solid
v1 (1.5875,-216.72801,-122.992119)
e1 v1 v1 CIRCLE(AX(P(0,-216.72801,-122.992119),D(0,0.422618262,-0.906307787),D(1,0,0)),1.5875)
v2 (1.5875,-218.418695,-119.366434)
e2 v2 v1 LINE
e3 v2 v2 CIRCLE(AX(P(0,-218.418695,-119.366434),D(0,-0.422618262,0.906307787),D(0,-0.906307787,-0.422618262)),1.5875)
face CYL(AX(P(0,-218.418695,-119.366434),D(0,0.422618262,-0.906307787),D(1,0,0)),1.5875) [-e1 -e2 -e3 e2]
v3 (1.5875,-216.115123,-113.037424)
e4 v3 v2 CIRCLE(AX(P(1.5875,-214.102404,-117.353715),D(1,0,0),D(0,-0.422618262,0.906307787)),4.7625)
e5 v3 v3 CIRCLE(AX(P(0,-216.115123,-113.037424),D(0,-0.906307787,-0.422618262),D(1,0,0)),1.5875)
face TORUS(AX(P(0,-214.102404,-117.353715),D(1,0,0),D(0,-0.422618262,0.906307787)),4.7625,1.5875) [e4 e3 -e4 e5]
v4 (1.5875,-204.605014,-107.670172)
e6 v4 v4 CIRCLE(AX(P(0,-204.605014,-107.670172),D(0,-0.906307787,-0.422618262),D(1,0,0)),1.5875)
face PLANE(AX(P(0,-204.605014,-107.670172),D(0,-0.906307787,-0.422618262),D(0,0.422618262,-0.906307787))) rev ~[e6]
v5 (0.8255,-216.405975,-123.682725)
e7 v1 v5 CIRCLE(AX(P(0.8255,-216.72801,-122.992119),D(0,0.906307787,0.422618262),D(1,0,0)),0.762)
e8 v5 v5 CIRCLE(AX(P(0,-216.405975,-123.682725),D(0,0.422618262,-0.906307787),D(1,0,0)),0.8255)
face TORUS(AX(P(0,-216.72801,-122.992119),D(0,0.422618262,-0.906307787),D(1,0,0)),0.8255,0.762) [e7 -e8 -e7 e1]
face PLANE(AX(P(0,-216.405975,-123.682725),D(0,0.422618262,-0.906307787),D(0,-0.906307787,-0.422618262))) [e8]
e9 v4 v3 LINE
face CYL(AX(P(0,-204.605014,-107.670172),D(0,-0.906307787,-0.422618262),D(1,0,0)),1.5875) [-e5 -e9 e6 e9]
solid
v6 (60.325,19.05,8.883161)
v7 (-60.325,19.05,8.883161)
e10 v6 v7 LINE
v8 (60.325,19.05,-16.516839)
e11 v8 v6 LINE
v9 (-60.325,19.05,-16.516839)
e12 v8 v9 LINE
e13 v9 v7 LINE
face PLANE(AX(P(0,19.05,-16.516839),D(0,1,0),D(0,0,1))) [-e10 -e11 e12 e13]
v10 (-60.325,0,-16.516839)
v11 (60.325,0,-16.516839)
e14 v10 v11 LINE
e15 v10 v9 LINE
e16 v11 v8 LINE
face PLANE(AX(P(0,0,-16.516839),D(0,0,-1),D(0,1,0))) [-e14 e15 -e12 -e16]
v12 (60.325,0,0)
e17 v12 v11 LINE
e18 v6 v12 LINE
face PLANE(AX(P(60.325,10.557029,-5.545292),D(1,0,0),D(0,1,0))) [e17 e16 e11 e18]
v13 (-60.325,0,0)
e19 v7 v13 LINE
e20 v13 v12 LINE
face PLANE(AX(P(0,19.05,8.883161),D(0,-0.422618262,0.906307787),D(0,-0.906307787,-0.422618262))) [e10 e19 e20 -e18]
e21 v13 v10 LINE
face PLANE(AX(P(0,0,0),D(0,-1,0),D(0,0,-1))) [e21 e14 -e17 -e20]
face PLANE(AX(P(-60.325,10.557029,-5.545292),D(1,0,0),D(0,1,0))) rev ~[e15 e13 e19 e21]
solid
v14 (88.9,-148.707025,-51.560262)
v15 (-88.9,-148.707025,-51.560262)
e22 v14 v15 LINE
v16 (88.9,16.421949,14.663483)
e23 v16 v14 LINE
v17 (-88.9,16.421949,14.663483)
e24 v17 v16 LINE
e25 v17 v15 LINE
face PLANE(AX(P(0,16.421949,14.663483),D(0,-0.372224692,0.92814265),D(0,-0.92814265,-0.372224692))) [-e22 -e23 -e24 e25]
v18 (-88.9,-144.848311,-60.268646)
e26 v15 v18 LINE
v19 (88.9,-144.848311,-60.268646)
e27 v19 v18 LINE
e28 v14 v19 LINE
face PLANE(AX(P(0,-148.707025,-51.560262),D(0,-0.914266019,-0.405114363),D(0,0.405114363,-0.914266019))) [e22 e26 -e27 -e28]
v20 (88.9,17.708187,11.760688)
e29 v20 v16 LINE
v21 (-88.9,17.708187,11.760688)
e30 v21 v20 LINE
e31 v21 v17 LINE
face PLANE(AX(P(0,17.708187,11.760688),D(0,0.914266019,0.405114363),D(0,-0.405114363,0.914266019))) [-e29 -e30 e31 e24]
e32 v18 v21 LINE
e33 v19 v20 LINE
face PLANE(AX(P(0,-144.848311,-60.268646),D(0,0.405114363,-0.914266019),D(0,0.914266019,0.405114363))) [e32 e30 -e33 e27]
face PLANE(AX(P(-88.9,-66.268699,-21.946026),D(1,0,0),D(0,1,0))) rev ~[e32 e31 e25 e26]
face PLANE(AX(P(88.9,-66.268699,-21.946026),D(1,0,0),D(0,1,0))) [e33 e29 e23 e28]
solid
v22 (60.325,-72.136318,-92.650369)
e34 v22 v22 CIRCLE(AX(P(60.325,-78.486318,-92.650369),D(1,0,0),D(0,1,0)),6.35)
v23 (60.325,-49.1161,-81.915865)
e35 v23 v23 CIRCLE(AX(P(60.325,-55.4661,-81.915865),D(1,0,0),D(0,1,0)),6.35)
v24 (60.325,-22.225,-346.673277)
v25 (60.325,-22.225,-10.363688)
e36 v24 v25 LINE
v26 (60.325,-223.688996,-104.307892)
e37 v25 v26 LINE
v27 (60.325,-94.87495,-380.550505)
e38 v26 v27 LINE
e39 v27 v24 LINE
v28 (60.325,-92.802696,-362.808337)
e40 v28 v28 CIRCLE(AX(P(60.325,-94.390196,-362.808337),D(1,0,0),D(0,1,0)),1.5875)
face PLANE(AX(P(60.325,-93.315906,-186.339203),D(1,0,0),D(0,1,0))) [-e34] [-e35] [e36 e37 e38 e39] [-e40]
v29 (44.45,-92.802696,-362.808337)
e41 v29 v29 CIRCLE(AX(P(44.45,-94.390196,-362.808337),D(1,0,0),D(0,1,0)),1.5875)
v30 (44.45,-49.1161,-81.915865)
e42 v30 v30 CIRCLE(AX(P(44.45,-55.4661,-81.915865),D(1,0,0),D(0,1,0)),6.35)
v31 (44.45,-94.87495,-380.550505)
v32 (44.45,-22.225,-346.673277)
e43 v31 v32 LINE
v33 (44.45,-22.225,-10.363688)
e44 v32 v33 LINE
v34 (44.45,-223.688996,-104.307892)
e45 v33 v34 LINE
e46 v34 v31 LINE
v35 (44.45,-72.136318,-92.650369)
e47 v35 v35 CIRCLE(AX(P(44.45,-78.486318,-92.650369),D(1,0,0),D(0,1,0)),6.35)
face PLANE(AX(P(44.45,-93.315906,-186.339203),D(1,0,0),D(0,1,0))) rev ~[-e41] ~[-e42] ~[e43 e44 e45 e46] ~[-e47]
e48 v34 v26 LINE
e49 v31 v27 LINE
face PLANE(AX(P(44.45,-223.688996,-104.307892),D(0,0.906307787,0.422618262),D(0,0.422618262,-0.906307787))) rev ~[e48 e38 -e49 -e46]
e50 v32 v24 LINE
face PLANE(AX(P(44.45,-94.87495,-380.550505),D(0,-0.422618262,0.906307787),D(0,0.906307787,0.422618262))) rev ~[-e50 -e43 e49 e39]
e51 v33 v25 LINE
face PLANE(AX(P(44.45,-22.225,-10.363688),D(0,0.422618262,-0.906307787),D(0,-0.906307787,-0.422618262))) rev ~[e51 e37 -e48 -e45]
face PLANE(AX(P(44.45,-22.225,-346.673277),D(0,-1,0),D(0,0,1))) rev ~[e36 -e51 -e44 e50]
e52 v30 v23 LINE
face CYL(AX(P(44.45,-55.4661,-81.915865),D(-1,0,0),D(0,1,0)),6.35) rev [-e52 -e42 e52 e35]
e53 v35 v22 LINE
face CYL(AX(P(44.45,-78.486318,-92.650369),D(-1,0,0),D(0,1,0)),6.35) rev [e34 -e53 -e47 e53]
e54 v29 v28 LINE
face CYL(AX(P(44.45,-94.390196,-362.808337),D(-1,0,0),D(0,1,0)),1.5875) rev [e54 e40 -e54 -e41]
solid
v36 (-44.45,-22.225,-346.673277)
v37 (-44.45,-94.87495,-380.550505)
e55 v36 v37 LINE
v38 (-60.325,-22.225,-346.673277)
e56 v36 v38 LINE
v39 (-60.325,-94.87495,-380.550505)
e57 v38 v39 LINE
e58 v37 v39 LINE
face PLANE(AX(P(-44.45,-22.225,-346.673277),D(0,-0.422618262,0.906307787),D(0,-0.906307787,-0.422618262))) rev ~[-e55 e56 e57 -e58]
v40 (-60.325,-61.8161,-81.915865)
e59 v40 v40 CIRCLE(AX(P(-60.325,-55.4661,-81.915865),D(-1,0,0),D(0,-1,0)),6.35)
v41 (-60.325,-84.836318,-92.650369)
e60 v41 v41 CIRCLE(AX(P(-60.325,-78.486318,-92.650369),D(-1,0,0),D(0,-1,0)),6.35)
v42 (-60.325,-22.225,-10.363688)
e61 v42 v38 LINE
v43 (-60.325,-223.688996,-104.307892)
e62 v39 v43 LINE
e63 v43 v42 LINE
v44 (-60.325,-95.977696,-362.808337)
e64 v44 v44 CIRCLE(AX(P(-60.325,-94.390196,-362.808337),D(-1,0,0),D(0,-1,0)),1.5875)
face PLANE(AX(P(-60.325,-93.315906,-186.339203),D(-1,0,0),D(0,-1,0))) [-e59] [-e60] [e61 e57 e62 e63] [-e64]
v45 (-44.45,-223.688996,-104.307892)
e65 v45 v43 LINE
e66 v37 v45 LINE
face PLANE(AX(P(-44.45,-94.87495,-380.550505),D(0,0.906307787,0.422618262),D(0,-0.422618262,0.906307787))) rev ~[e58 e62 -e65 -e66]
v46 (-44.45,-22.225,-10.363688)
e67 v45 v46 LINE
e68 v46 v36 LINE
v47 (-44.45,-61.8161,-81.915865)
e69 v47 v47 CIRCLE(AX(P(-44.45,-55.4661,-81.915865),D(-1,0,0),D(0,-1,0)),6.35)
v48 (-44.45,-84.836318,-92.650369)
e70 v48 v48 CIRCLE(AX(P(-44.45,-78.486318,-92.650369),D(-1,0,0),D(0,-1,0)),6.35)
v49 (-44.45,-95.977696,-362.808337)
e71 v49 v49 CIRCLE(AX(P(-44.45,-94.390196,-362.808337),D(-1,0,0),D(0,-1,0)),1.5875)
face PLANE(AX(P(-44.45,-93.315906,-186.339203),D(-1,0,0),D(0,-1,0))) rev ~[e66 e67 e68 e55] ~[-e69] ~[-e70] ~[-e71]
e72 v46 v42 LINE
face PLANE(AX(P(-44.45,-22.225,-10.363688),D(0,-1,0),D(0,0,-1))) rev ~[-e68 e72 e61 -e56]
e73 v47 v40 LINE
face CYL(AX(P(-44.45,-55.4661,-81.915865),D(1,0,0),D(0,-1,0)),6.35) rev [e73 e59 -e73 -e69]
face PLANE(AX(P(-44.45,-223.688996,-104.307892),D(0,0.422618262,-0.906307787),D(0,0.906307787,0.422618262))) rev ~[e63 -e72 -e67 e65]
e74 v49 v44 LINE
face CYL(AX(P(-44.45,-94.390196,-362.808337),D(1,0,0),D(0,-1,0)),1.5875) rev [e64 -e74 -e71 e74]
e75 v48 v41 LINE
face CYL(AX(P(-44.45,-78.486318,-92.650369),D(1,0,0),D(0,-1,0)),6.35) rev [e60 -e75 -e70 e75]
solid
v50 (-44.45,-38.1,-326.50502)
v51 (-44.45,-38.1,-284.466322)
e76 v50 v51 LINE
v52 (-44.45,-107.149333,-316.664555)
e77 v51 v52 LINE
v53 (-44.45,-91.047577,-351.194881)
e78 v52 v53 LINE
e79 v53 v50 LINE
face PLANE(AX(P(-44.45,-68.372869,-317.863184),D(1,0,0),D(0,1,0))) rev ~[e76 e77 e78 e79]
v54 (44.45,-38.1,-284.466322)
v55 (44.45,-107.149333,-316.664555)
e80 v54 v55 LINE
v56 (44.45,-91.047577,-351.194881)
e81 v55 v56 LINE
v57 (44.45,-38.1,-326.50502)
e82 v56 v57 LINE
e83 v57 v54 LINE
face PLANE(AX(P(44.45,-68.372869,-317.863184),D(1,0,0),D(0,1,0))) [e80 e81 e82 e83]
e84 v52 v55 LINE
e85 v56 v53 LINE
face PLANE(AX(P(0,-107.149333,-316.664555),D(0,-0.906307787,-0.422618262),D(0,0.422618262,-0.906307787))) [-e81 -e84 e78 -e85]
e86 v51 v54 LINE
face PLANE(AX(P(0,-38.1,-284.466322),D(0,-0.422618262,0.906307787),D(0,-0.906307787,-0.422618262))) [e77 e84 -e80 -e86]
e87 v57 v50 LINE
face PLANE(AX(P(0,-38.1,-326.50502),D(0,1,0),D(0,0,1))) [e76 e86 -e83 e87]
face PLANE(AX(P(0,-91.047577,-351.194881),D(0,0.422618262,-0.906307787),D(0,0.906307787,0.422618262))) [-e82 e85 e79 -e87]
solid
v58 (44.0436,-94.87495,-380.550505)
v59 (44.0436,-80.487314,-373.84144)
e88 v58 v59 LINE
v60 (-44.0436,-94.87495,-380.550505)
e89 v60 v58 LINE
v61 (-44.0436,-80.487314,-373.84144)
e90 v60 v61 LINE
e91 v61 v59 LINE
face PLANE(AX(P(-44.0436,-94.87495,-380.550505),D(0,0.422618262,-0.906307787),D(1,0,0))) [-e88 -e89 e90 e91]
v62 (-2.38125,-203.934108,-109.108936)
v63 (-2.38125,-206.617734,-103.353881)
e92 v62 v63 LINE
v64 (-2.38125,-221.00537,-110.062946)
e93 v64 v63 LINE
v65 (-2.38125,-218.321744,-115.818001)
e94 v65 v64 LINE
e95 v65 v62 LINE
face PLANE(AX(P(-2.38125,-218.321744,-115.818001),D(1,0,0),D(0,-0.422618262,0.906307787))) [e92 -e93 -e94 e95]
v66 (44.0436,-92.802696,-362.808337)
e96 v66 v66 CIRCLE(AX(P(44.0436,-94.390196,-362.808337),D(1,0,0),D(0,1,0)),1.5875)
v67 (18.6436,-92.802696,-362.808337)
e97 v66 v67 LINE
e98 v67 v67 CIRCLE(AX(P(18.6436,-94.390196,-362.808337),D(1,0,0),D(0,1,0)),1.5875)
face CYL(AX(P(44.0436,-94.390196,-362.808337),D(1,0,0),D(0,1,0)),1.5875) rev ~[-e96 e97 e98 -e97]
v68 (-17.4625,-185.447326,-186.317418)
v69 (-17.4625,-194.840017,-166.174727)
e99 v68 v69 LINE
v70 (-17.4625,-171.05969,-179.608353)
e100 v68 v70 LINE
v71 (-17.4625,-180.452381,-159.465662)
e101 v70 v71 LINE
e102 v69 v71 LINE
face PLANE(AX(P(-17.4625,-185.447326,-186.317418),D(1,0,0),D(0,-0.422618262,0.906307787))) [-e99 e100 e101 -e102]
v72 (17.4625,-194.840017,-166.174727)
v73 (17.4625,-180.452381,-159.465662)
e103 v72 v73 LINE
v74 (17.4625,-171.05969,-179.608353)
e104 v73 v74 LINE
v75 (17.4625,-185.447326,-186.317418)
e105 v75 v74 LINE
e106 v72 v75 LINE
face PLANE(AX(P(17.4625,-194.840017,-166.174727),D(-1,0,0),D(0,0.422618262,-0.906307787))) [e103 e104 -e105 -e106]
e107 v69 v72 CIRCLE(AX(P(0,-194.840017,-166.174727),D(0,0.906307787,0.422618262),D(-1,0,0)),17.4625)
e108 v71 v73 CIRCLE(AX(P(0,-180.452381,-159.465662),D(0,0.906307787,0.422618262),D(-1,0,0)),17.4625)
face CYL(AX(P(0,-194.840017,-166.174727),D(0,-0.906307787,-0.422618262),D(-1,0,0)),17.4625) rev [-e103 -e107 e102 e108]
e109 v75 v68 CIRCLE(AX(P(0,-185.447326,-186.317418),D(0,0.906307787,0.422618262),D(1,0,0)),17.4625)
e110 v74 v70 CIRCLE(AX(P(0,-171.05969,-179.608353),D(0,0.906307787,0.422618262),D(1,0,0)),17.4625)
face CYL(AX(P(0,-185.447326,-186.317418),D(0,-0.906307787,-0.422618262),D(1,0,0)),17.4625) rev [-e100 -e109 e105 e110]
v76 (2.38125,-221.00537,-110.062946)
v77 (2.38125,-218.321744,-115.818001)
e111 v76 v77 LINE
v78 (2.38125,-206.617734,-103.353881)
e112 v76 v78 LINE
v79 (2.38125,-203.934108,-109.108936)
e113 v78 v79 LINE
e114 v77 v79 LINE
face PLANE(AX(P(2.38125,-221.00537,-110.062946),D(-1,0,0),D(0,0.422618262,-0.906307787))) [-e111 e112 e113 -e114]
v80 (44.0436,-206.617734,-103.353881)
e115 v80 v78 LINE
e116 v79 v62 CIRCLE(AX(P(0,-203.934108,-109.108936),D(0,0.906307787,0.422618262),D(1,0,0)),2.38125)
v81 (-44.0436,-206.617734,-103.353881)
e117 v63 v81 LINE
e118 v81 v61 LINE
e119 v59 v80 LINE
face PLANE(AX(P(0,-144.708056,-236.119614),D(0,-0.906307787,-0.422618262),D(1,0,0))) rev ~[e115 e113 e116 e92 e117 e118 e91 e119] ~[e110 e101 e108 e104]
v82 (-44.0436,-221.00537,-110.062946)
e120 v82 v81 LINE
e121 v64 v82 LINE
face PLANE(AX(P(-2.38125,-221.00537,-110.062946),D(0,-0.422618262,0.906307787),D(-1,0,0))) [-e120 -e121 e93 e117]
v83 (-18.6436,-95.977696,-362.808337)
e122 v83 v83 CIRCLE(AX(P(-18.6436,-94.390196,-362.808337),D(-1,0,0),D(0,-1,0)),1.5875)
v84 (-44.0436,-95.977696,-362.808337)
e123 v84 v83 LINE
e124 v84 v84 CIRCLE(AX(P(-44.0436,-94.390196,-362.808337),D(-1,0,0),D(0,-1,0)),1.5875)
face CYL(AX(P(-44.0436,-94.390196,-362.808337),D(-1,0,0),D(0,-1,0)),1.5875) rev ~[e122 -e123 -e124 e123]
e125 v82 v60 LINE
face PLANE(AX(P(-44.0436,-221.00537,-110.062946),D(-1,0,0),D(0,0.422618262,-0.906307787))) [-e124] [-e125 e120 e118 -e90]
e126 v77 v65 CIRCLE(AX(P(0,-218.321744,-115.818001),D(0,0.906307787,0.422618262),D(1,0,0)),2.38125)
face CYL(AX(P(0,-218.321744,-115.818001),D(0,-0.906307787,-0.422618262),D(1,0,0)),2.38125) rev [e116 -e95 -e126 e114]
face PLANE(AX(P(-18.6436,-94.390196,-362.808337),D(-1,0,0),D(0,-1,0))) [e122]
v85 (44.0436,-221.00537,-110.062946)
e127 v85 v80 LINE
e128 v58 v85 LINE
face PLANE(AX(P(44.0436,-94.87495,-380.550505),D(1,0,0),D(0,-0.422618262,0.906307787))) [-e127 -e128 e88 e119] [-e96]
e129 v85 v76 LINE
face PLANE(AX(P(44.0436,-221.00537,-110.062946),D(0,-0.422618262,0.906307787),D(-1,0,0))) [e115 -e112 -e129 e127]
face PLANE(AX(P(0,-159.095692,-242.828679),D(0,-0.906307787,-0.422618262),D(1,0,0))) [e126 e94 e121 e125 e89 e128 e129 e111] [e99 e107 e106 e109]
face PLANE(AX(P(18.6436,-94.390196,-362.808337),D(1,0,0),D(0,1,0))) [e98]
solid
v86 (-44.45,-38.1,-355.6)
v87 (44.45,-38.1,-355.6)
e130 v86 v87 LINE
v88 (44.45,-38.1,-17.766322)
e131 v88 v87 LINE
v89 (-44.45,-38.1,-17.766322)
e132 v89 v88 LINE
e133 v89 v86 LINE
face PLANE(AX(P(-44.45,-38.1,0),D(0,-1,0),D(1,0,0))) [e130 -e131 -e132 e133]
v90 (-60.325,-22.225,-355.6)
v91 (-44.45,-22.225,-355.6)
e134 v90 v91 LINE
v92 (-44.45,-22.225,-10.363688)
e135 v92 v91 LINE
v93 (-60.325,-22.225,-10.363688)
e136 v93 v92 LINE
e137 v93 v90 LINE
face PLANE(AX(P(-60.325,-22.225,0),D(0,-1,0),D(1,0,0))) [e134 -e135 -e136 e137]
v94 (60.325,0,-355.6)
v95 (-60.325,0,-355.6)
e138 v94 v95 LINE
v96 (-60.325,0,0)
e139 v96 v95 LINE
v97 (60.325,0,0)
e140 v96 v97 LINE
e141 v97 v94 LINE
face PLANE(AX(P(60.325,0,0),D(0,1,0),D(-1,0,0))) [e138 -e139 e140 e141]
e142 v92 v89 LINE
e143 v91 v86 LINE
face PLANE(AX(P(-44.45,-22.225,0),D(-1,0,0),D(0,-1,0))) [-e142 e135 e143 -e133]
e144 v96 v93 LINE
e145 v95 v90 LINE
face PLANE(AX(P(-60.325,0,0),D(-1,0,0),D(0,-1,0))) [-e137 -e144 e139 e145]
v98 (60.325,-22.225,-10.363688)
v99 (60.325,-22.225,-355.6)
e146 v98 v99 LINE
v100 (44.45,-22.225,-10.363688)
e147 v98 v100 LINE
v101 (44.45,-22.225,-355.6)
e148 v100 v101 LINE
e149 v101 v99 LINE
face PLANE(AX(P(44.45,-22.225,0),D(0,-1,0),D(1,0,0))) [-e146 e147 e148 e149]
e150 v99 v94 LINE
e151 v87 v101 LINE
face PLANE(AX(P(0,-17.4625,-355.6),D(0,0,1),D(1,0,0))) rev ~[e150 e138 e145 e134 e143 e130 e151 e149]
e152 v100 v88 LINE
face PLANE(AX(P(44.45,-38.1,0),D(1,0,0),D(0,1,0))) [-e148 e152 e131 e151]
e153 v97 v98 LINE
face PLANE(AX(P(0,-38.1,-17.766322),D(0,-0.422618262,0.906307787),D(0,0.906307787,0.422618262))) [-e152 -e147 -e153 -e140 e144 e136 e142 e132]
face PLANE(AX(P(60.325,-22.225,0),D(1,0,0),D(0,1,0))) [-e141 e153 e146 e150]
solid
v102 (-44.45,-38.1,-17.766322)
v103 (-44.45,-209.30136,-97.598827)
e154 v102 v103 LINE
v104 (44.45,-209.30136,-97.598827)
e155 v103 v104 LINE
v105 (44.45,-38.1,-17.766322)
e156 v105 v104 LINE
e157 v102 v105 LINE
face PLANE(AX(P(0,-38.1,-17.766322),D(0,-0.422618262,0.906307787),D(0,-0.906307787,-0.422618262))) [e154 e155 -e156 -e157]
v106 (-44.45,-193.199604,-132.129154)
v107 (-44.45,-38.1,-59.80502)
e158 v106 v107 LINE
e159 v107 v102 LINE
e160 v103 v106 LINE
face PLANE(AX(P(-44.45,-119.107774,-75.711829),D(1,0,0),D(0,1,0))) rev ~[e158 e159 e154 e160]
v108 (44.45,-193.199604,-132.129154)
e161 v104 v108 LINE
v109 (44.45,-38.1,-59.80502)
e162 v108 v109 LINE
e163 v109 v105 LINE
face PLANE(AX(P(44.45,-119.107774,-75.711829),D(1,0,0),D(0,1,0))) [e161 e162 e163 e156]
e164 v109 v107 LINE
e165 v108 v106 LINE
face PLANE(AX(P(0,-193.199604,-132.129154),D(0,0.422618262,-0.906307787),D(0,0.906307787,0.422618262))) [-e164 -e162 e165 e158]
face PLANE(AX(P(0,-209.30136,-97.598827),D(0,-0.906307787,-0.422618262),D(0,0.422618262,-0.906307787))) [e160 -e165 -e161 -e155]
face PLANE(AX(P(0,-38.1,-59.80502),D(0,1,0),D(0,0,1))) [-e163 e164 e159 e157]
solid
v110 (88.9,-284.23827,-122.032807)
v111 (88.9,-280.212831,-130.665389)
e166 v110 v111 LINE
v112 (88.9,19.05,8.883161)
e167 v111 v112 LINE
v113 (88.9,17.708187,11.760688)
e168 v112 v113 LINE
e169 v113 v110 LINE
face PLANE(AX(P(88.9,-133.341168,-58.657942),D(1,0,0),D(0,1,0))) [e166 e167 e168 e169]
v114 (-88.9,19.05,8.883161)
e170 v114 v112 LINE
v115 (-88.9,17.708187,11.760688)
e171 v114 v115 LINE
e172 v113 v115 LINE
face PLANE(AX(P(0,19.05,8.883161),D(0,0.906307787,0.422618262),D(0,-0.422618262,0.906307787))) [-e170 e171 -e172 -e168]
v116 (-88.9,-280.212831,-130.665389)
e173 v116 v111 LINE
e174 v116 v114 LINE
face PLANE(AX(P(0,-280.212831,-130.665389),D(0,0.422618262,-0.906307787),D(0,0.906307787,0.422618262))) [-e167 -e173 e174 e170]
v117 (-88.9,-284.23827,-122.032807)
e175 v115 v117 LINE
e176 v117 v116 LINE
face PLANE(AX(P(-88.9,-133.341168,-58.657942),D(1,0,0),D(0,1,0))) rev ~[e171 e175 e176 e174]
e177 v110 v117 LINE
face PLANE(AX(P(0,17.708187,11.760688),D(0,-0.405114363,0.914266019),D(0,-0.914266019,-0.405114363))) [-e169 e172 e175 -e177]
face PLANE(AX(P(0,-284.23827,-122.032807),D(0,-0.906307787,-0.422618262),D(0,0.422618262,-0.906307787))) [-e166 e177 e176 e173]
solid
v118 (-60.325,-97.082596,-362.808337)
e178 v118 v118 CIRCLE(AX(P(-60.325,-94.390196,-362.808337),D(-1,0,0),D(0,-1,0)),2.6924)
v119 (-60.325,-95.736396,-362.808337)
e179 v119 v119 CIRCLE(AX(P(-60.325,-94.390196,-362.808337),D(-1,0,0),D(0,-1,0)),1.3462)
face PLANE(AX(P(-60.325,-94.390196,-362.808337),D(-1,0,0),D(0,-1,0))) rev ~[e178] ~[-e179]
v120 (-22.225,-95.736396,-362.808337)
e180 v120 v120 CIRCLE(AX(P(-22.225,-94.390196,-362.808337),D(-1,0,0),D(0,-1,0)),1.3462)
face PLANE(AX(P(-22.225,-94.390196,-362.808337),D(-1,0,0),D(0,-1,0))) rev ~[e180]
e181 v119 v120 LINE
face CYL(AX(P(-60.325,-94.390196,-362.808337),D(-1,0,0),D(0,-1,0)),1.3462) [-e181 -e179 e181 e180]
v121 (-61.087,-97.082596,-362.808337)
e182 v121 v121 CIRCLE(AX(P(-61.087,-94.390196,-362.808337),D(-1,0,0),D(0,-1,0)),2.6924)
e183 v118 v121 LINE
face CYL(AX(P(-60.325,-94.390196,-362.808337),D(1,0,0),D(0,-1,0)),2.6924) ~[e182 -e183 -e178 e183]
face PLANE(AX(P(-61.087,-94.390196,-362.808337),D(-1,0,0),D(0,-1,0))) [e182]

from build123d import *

# Parameters (mm, degrees)
F1_DEPTH       = 355.6
F3_DEPTH       = 60.326
F3_DEPTH_BACK  = 60.326
F5_DEPTH       = 44.45
F7_DEPTH       = 44.45
F8_R           = 1.5875
F8_R_2         = 6.35
F9_DEPTH       = 15.875
F10_R          = 1.5875
F10_R_2        = 6.35
F11_DEPTH      = 15.875
F13_DEPTH      = 15.875
F14_R          = 1.5875
F15_DEPTH      = 25.4
F16_R          = 1.5875
F17_DEPTH      = 25.4
F19_DEPTH      = 88.9
F21_DEPTH      = 88.9
F21_DEPTH_BACK = 88.9
F23_DEPTH      = 60.325
F24_R          = 1.3462
F25_DEPTH      = 38.1
F26_R          = 2.6924
F27_DEPTH      = 0.762
F29_R          = 1.5875
F31_R          = 0.762


with BuildPart() as f1:
    # F0 (on Top) → F1 (new body)
    with BuildSketch(Plane.XY):
        Polygon((60.325, 0), (-60.325, 0), (-60.325, -22.225), (-44.45, -22.225), (-44.45, -38.1), (44.45, -38.1), (44.45, -22.225), (60.325, -22.225), align=None)
    extrude(amount=-F1_DEPTH)

    # F2 (on Right) → F3 (cut, two sides)
    with BuildSketch(Plane.YZ) as f3_sk:
        Polygon((-38.1, -17.7663217757), (0, 0), (-38.1, 0), align=None)
    extrude(amount=-F3_DEPTH, mode=Mode.SUBTRACT)
    extrude(f3_sk.sketch, amount=F3_DEPTH_BACK, mode=Mode.SUBTRACT)


with BuildPart() as f5:
    # F4 (on Right) → F5 (new body, symmetric)
    with BuildSketch(Plane.YZ):
        Polygon((-38.1, -59.8050204882), (-38.1, -17.7663217757), (-209.3013597097, -97.5988268949), (-193.1996039373, -132.129153581), align=None)
    extrude(amount=F5_DEPTH, both=True)


with BuildPart() as f7:
    # F6 (on Right) → F7 (new body, symmetric)
    with BuildSketch(Plane.YZ):
        Polygon((-38.1, -326.5050204882), (-38.1, -284.4663217757), (-107.1493332197, -316.6645546466), (-91.0475774474, -351.1948813327), align=None)
    extrude(amount=F7_DEPTH, both=True)


with BuildPart() as f9:
    # F8 (on face) → F9 (new body, through all)
    with BuildSketch(Plane(origin=(-44.45, 0, 0), x_dir=(0, -1, 0), z_dir=(-1, 0, 0))):
        Polygon((223.6889958289, -104.3078918), (22.225, -10.3636877025), (22.225, -346.6732774023), (94.8749496503, -380.5505052888), align=None)
        with Locations((94.3901964958, -362.808336717)):
            Circle(F8_R, mode=Mode.SUBTRACT)
        with Locations((55.4660997165, -81.9158653491)):
            Circle(F8_R_2, mode=Mode.SUBTRACT)
        with Locations((78.4863175073, -92.6503691973)):
            Circle(F8_R_2, mode=Mode.SUBTRACT)
    extrude(amount=F9_DEPTH)


with BuildPart() as f11:
    # F10 (on face) → F11 (new body, through all)
    with BuildSketch(Plane.YZ.offset(44.45)):
        Polygon((-22.225, -346.6732774023), (-22.225, -10.3636877025), (-223.6889958289, -104.3078918), (-94.8749496503, -380.5505052888), align=None)
        with Locations((-94.3901964958, -362.808336717)):
            Circle(F10_R, mode=Mode.SUBTRACT)
        with Locations((-78.4863175073, -92.6503691973)):
            Circle(F10_R_2, mode=Mode.SUBTRACT)
        with Locations((-55.4660997165, -81.9158653491)):
            Circle(F10_R_2, mode=Mode.SUBTRACT)
    extrude(amount=F11_DEPTH)


with BuildPart() as f13:
    # F12 (on face) → F13 (new body)
    with BuildSketch(Plane(origin=(0, -223.6889958289, -104.3078918), x_dir=(1, 0, 0), z_dir=(0, -0.906307787, -0.4226182617))):
        with BuildLine():
            Line((-2.38125, -6.35), (-44.0436, -6.35))
            Line((-44.0436, -6.35), (-44.0436, -304.8))
            Line((-44.0436, -304.8), (44.0436, -304.8))
            Line((44.0436, -304.8), (44.0436, -6.35))
            Line((44.0436, -6.35), (2.38125, -6.35))
            Line((2.38125, -6.35), (2.38125, -12.7))
            ThreePointArc((2.38125, -12.7), (0, -15.08125), (-2.38125, -12.7))
            Line((-2.38125, -12.7), (-2.38125, -6.35))
        make_face()
        with BuildLine():
            ThreePointArc((17.4625, -90.4875), (0, -107.95), (-17.4625, -90.4875))
            Line((-17.4625, -90.4875), (-17.4625, -68.2625))
            ThreePointArc((-17.4625, -68.2625), (0, -50.8), (17.4625, -68.2625))
            Line((17.4625, -68.2625), (17.4625, -90.4875))
        make_face(mode=Mode.SUBTRACT)
    extrude(amount=-F13_DEPTH)

    # F14 (on face) → F15 (cut)
    with BuildSketch(Plane(origin=(-44.0436, 0, 0), x_dir=(0, -1, 0), z_dir=(-1, 0, 0))):
        with Locations((94.3901964958, -362.808336717)):
            Circle(F14_R)
    extrude(amount=-F15_DEPTH, mode=Mode.SUBTRACT)

    # F16 (on face) → F17 (cut)
    with BuildSketch(Plane.YZ.offset(44.0436)):
        with Locations((-94.3901964958, -362.808336717)):
            Circle(F16_R)
    extrude(amount=-F17_DEPTH, mode=Mode.SUBTRACT)


with BuildPart() as f19:
    # F18 (on Right) → F19 (new body, symmetric)
    with BuildSketch(Plane.YZ):
        Polygon((-284.2382702226, -122.0328074674), (-280.2128312795, -130.6653891389), (19.05, 8.8831608879), (17.708187019, 11.7606881117), align=None)
    extrude(amount=F19_DEPTH, both=True)


with BuildPart() as f21:
    # F20 (on Right) → F21 (new body, two sides)
    with BuildSketch(Plane.YZ) as f21_sk:
        Polygon((-144.8483111348, -60.2686455516), (17.708187019, 11.7606881117), (16.4219489178, 14.6634827216), (-148.7070254382, -51.5602617219), align=None)
    extrude(amount=F21_DEPTH)
    extrude(f21_sk.sketch, amount=-F21_DEPTH_BACK)


with BuildPart() as f23:
    # F22 (on Right) → F23 (new body, symmetric)
    with BuildSketch(Plane.YZ):
        Polygon((19.05, 8.8831608879), (0, 0), (0, -16.5168391121), (19.05, -16.5168391121), align=None)
    extrude(amount=F23_DEPTH, both=True)


with BuildPart() as f25:
    # F24 (on face) → F25 (new body)
    with BuildSketch(Plane(origin=(-60.325, 0, 0), x_dir=(0, -1, 0), z_dir=(-1, 0, 0))):
        with Locations((94.3901964958, -362.808336717)):
            Circle(F24_R)
    extrude(amount=-F25_DEPTH)

    # F26 (on face) → F27 (join)
    with BuildSketch(Plane(origin=(-60.325, 0, 0), x_dir=(0, -1, 0), z_dir=(-1, 0, 0))):
        with Locations((94.3901964958, -362.808336717)):
            Circle(F26_R)
    extrude(amount=F27_DEPTH)


with BuildPart() as f30:
    # F30: sweep along a path in F28
    with BuildLine(Plane.YZ) as f30_path:
        Line((-204.6050142761, -107.6701721783), (-216.1151231714, -113.0374241024))
        ThreePointArc((-216.1151231714, -113.0374241024), (-218.5776898064, -115.7248440056), (-218.4186945357, -119.3664344097))
        Line((-218.4186945357, -119.3664344097), (-216.4059750641, -123.6827252455))
    # F29 (on face) → F30 (sweep)
    with BuildSketch(Plane(origin=(0, -209.3013597097, -97.5988268949), x_dir=(1, 0, 0), z_dir=(0, -0.906307787, -0.4226182617))):
        with Locations((0, -11.1125)):
            Circle(F29_R)
    sweep(path=f30_path.line)

    # F31
    f31_edges = [f30.edges().sort_by_distance(p)[0] for p in [
        (-1.5875, -216.405975, -123.682725),
    ]]
    fillet(f31_edges, radius=F31_R)


solid = Compound([f1.part, f5.part, f7.part, f9.part, f11.part, f13.part, f19.part, f21.part, f23.part, f25.part, f30.part])
